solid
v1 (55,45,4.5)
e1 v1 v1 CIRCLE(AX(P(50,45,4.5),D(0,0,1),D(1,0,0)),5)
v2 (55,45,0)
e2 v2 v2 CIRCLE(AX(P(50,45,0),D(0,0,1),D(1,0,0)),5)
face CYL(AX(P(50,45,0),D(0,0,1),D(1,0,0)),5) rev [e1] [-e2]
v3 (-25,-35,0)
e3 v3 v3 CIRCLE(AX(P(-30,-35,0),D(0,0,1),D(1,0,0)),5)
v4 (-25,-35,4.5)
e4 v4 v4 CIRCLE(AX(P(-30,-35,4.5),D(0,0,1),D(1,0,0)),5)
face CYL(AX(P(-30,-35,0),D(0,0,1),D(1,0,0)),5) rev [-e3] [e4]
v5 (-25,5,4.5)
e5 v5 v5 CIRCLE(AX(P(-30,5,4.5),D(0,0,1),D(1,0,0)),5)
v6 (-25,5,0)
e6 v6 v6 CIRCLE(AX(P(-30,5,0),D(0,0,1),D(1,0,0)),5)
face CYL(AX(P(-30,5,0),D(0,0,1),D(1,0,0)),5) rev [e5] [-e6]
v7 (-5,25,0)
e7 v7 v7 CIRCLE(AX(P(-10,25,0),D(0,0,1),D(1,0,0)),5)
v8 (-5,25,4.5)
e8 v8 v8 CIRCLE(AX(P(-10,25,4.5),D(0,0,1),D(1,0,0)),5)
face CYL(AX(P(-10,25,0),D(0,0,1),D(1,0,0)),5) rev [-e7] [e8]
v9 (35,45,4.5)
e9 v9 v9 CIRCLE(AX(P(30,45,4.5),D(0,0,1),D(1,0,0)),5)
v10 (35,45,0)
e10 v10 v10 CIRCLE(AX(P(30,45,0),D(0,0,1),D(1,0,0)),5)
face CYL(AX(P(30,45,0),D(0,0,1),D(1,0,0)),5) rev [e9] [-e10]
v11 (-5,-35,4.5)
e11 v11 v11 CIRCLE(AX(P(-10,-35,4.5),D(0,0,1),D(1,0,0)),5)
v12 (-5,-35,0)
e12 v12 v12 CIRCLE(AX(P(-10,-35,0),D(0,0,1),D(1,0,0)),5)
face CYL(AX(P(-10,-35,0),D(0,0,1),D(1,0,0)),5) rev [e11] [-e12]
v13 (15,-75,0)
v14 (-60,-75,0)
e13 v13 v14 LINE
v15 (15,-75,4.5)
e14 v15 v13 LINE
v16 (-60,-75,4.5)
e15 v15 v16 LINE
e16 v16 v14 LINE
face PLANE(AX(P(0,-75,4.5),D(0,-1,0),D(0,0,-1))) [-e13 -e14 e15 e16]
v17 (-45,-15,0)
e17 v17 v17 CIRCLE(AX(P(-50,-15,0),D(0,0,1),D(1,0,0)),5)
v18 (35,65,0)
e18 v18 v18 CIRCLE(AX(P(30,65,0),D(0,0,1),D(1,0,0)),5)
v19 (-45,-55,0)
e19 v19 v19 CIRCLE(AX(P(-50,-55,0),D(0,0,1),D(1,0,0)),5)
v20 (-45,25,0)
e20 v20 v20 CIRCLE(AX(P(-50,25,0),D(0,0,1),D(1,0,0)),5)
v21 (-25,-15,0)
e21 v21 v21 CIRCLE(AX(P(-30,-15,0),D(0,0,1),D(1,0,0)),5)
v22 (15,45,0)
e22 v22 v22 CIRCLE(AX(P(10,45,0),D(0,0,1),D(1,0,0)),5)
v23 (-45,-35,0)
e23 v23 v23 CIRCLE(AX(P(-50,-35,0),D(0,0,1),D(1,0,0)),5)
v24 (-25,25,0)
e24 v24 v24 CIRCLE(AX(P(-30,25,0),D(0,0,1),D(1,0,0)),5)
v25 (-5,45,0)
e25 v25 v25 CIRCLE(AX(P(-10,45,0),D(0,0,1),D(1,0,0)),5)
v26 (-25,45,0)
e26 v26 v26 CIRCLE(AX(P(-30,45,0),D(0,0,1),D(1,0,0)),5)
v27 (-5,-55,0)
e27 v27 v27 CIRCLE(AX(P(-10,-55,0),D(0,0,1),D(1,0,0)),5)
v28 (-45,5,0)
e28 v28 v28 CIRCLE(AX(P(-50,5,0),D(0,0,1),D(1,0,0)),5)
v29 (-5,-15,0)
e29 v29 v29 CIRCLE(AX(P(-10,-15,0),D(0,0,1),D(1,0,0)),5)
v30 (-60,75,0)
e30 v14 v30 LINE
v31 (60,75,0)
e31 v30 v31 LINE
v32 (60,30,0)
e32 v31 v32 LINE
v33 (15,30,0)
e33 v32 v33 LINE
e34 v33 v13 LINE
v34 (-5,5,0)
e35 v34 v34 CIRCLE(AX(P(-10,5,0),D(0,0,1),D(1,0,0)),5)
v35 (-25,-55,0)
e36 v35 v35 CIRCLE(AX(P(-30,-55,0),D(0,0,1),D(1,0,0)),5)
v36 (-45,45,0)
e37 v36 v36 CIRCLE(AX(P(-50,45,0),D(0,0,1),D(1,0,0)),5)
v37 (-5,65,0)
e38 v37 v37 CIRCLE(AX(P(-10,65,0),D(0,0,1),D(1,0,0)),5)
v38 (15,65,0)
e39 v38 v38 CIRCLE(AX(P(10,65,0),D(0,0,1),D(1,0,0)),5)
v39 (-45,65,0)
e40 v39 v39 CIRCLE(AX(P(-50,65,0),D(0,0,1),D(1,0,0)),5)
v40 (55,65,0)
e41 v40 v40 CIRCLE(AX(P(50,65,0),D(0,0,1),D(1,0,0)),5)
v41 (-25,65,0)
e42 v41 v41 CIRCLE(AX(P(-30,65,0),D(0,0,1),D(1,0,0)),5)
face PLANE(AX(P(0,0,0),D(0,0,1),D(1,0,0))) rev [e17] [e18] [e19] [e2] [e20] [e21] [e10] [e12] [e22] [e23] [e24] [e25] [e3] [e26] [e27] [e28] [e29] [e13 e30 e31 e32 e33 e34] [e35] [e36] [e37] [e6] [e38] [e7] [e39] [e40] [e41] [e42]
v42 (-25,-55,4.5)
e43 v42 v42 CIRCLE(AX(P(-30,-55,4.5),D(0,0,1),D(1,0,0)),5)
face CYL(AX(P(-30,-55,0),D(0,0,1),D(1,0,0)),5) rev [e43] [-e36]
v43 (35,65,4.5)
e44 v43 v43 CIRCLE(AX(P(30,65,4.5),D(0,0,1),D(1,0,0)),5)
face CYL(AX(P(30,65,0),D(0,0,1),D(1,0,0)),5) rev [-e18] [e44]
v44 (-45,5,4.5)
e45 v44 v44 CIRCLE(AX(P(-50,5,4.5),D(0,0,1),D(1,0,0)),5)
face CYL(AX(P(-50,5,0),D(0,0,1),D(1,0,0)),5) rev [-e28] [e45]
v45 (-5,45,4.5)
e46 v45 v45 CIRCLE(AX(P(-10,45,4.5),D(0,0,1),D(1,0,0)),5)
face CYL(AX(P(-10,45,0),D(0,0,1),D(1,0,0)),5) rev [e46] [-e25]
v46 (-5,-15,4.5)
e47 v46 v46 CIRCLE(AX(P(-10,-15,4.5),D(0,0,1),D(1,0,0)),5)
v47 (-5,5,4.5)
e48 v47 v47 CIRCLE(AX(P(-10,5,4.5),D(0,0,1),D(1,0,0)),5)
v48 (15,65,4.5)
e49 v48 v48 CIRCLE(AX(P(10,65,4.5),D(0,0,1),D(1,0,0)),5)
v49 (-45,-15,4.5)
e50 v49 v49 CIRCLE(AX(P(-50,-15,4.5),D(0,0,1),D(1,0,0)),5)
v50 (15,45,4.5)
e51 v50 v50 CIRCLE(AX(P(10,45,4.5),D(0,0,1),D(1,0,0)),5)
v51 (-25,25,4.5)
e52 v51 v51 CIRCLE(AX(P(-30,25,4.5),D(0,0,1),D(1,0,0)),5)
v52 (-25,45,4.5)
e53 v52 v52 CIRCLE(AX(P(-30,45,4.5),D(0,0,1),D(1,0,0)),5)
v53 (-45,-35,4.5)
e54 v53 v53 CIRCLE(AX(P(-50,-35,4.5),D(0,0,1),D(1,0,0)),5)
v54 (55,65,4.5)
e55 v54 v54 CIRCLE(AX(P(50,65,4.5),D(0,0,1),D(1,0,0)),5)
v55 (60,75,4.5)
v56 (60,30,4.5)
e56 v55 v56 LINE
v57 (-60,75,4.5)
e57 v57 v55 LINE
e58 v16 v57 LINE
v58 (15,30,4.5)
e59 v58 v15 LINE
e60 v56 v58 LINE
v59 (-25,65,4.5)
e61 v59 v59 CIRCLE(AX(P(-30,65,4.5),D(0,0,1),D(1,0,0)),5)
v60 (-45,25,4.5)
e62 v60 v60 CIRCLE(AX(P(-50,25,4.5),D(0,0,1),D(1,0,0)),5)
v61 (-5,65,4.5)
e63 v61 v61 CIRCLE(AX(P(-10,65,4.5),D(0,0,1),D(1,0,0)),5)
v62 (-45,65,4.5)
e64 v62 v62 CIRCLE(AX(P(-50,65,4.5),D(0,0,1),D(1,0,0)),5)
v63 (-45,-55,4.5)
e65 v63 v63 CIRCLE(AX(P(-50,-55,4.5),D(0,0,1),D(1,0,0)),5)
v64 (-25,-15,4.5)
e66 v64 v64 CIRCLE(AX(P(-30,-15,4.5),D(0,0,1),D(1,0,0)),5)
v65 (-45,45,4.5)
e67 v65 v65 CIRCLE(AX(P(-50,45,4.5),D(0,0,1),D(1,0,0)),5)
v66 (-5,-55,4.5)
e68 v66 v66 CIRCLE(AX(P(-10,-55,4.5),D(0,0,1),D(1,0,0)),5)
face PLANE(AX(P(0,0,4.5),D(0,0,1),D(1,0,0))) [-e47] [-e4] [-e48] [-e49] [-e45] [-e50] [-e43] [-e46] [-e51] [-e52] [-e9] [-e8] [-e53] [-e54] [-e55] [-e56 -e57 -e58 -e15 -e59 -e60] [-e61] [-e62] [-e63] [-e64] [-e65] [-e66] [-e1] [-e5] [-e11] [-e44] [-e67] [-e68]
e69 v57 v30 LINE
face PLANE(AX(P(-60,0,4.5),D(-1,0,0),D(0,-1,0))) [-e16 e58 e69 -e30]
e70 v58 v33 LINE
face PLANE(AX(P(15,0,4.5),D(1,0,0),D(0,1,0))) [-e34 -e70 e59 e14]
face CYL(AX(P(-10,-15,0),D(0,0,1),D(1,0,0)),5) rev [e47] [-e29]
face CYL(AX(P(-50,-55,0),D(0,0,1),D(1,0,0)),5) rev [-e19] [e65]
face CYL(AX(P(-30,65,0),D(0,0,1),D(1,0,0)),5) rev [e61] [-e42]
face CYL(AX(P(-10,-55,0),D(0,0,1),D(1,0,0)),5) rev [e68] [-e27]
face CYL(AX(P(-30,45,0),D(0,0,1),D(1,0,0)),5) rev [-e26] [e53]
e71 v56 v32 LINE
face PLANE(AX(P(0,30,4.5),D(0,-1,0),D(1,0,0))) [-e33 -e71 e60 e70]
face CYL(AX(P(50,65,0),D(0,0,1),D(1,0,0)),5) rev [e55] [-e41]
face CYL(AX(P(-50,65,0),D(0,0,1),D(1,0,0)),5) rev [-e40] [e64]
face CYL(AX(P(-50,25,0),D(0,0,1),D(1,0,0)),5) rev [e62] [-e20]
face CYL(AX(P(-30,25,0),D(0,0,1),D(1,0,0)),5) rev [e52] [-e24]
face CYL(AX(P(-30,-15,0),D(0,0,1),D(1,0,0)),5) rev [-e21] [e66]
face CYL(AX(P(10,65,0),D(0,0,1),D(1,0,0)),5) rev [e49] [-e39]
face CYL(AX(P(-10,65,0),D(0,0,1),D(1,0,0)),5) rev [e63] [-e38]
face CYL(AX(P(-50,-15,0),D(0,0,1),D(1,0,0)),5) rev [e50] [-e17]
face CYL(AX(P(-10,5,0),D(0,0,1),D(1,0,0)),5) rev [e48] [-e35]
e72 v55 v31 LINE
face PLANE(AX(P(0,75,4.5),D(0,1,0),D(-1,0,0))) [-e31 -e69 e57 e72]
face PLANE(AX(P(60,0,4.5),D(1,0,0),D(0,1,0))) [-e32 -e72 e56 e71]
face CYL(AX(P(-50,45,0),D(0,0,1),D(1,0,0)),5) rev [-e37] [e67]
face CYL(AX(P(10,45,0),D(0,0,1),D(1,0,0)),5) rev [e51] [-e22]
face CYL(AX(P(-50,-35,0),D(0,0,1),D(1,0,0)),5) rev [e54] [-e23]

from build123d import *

# Parameters (mm, degrees)
BOSS_EXTRUDE1_DEPTH     = 4.5
SKETCH3_R               = 5
CUT_EXTRUDE1_DEPTH      = 97.152223063
FILL_PATTERN1_OUTLINE_R = 5
FILL_PATTERN1_DEPTH     = 4.5


# Read off the part's stored shape, not the designer's step: Fill Pattern1
with BuildPart() as part:
    # Sketch2 → Boss-Extrude1 (new body)
    with BuildSketch(Plane.XY):
        Polygon((15, -75), (-60, -75), (-60, 75), (60, 75), (60, 30), (15, 30), align=None)
    extrude(amount=BOSS_EXTRUDE1_DEPTH)

    # Sketch3 → Cut-Extrude1 (cut, through all)
    with BuildSketch(Plane.XY.offset(4.5)):
        with Locations((-50, 65)):
            Circle(SKETCH3_R)
    extrude(amount=-CUT_EXTRUDE1_DEPTH, mode=Mode.SUBTRACT)

    # Fill Pattern1 outline → Fill Pattern1 (cut)
    with BuildSketch(Plane.XY):
        with Locations((-30, 65)):
            Circle(FILL_PATTERN1_OUTLINE_R)
        with Locations((-30, -55)):
            Circle(FILL_PATTERN1_OUTLINE_R)
        with Locations((-10, -55)):
            Circle(FILL_PATTERN1_OUTLINE_R)
        with Locations((-50, -35)):
            Circle(FILL_PATTERN1_OUTLINE_R)
        with Locations((-30, -35)):
            Circle(FILL_PATTERN1_OUTLINE_R)
        with Locations((-50, -15)):
            Circle(FILL_PATTERN1_OUTLINE_R)
        with Locations((50, 65)):
            Circle(FILL_PATTERN1_OUTLINE_R)
        with Locations((50, 45)):
            Circle(FILL_PATTERN1_OUTLINE_R)
        with Locations((-10, -35)):
            Circle(FILL_PATTERN1_OUTLINE_R)
        with Locations((-50, -55)):
            Circle(FILL_PATTERN1_OUTLINE_R)
        with Locations((-10, 25)):
            Circle(FILL_PATTERN1_OUTLINE_R)
        with Locations((-30, 25)):
            Circle(FILL_PATTERN1_OUTLINE_R)
        with Locations((-50, 25)):
            Circle(FILL_PATTERN1_OUTLINE_R)
        with Locations((10, 65)):
            Circle(FILL_PATTERN1_OUTLINE_R)
        with Locations((-10, 45)):
            Circle(FILL_PATTERN1_OUTLINE_R)
        with Locations((-10, 65)):
            Circle(FILL_PATTERN1_OUTLINE_R)
        with Locations((-50, 45)):
            Circle(FILL_PATTERN1_OUTLINE_R)
        with Locations((-30, 45)):
            Circle(FILL_PATTERN1_OUTLINE_R)
        with Locations((-30, -15)):
            Circle(FILL_PATTERN1_OUTLINE_R)
        with Locations((-10, -15)):
            Circle(FILL_PATTERN1_OUTLINE_R)
        with Locations((30, 45)):
            Circle(FILL_PATTERN1_OUTLINE_R)
        with Locations((30, 65)):
            Circle(FILL_PATTERN1_OUTLINE_R)
        with Locations((-50, 5)):
            Circle(FILL_PATTERN1_OUTLINE_R)
        with Locations((-30, 5)):
            Circle(FILL_PATTERN1_OUTLINE_R)
        with Locations((-10, 5)):
            Circle(FILL_PATTERN1_OUTLINE_R)
        with Locations((10, 45)):
            Circle(FILL_PATTERN1_OUTLINE_R)
    extrude(amount=FILL_PATTERN1_DEPTH, mode=Mode.SUBTRACT)


solid = part.part
